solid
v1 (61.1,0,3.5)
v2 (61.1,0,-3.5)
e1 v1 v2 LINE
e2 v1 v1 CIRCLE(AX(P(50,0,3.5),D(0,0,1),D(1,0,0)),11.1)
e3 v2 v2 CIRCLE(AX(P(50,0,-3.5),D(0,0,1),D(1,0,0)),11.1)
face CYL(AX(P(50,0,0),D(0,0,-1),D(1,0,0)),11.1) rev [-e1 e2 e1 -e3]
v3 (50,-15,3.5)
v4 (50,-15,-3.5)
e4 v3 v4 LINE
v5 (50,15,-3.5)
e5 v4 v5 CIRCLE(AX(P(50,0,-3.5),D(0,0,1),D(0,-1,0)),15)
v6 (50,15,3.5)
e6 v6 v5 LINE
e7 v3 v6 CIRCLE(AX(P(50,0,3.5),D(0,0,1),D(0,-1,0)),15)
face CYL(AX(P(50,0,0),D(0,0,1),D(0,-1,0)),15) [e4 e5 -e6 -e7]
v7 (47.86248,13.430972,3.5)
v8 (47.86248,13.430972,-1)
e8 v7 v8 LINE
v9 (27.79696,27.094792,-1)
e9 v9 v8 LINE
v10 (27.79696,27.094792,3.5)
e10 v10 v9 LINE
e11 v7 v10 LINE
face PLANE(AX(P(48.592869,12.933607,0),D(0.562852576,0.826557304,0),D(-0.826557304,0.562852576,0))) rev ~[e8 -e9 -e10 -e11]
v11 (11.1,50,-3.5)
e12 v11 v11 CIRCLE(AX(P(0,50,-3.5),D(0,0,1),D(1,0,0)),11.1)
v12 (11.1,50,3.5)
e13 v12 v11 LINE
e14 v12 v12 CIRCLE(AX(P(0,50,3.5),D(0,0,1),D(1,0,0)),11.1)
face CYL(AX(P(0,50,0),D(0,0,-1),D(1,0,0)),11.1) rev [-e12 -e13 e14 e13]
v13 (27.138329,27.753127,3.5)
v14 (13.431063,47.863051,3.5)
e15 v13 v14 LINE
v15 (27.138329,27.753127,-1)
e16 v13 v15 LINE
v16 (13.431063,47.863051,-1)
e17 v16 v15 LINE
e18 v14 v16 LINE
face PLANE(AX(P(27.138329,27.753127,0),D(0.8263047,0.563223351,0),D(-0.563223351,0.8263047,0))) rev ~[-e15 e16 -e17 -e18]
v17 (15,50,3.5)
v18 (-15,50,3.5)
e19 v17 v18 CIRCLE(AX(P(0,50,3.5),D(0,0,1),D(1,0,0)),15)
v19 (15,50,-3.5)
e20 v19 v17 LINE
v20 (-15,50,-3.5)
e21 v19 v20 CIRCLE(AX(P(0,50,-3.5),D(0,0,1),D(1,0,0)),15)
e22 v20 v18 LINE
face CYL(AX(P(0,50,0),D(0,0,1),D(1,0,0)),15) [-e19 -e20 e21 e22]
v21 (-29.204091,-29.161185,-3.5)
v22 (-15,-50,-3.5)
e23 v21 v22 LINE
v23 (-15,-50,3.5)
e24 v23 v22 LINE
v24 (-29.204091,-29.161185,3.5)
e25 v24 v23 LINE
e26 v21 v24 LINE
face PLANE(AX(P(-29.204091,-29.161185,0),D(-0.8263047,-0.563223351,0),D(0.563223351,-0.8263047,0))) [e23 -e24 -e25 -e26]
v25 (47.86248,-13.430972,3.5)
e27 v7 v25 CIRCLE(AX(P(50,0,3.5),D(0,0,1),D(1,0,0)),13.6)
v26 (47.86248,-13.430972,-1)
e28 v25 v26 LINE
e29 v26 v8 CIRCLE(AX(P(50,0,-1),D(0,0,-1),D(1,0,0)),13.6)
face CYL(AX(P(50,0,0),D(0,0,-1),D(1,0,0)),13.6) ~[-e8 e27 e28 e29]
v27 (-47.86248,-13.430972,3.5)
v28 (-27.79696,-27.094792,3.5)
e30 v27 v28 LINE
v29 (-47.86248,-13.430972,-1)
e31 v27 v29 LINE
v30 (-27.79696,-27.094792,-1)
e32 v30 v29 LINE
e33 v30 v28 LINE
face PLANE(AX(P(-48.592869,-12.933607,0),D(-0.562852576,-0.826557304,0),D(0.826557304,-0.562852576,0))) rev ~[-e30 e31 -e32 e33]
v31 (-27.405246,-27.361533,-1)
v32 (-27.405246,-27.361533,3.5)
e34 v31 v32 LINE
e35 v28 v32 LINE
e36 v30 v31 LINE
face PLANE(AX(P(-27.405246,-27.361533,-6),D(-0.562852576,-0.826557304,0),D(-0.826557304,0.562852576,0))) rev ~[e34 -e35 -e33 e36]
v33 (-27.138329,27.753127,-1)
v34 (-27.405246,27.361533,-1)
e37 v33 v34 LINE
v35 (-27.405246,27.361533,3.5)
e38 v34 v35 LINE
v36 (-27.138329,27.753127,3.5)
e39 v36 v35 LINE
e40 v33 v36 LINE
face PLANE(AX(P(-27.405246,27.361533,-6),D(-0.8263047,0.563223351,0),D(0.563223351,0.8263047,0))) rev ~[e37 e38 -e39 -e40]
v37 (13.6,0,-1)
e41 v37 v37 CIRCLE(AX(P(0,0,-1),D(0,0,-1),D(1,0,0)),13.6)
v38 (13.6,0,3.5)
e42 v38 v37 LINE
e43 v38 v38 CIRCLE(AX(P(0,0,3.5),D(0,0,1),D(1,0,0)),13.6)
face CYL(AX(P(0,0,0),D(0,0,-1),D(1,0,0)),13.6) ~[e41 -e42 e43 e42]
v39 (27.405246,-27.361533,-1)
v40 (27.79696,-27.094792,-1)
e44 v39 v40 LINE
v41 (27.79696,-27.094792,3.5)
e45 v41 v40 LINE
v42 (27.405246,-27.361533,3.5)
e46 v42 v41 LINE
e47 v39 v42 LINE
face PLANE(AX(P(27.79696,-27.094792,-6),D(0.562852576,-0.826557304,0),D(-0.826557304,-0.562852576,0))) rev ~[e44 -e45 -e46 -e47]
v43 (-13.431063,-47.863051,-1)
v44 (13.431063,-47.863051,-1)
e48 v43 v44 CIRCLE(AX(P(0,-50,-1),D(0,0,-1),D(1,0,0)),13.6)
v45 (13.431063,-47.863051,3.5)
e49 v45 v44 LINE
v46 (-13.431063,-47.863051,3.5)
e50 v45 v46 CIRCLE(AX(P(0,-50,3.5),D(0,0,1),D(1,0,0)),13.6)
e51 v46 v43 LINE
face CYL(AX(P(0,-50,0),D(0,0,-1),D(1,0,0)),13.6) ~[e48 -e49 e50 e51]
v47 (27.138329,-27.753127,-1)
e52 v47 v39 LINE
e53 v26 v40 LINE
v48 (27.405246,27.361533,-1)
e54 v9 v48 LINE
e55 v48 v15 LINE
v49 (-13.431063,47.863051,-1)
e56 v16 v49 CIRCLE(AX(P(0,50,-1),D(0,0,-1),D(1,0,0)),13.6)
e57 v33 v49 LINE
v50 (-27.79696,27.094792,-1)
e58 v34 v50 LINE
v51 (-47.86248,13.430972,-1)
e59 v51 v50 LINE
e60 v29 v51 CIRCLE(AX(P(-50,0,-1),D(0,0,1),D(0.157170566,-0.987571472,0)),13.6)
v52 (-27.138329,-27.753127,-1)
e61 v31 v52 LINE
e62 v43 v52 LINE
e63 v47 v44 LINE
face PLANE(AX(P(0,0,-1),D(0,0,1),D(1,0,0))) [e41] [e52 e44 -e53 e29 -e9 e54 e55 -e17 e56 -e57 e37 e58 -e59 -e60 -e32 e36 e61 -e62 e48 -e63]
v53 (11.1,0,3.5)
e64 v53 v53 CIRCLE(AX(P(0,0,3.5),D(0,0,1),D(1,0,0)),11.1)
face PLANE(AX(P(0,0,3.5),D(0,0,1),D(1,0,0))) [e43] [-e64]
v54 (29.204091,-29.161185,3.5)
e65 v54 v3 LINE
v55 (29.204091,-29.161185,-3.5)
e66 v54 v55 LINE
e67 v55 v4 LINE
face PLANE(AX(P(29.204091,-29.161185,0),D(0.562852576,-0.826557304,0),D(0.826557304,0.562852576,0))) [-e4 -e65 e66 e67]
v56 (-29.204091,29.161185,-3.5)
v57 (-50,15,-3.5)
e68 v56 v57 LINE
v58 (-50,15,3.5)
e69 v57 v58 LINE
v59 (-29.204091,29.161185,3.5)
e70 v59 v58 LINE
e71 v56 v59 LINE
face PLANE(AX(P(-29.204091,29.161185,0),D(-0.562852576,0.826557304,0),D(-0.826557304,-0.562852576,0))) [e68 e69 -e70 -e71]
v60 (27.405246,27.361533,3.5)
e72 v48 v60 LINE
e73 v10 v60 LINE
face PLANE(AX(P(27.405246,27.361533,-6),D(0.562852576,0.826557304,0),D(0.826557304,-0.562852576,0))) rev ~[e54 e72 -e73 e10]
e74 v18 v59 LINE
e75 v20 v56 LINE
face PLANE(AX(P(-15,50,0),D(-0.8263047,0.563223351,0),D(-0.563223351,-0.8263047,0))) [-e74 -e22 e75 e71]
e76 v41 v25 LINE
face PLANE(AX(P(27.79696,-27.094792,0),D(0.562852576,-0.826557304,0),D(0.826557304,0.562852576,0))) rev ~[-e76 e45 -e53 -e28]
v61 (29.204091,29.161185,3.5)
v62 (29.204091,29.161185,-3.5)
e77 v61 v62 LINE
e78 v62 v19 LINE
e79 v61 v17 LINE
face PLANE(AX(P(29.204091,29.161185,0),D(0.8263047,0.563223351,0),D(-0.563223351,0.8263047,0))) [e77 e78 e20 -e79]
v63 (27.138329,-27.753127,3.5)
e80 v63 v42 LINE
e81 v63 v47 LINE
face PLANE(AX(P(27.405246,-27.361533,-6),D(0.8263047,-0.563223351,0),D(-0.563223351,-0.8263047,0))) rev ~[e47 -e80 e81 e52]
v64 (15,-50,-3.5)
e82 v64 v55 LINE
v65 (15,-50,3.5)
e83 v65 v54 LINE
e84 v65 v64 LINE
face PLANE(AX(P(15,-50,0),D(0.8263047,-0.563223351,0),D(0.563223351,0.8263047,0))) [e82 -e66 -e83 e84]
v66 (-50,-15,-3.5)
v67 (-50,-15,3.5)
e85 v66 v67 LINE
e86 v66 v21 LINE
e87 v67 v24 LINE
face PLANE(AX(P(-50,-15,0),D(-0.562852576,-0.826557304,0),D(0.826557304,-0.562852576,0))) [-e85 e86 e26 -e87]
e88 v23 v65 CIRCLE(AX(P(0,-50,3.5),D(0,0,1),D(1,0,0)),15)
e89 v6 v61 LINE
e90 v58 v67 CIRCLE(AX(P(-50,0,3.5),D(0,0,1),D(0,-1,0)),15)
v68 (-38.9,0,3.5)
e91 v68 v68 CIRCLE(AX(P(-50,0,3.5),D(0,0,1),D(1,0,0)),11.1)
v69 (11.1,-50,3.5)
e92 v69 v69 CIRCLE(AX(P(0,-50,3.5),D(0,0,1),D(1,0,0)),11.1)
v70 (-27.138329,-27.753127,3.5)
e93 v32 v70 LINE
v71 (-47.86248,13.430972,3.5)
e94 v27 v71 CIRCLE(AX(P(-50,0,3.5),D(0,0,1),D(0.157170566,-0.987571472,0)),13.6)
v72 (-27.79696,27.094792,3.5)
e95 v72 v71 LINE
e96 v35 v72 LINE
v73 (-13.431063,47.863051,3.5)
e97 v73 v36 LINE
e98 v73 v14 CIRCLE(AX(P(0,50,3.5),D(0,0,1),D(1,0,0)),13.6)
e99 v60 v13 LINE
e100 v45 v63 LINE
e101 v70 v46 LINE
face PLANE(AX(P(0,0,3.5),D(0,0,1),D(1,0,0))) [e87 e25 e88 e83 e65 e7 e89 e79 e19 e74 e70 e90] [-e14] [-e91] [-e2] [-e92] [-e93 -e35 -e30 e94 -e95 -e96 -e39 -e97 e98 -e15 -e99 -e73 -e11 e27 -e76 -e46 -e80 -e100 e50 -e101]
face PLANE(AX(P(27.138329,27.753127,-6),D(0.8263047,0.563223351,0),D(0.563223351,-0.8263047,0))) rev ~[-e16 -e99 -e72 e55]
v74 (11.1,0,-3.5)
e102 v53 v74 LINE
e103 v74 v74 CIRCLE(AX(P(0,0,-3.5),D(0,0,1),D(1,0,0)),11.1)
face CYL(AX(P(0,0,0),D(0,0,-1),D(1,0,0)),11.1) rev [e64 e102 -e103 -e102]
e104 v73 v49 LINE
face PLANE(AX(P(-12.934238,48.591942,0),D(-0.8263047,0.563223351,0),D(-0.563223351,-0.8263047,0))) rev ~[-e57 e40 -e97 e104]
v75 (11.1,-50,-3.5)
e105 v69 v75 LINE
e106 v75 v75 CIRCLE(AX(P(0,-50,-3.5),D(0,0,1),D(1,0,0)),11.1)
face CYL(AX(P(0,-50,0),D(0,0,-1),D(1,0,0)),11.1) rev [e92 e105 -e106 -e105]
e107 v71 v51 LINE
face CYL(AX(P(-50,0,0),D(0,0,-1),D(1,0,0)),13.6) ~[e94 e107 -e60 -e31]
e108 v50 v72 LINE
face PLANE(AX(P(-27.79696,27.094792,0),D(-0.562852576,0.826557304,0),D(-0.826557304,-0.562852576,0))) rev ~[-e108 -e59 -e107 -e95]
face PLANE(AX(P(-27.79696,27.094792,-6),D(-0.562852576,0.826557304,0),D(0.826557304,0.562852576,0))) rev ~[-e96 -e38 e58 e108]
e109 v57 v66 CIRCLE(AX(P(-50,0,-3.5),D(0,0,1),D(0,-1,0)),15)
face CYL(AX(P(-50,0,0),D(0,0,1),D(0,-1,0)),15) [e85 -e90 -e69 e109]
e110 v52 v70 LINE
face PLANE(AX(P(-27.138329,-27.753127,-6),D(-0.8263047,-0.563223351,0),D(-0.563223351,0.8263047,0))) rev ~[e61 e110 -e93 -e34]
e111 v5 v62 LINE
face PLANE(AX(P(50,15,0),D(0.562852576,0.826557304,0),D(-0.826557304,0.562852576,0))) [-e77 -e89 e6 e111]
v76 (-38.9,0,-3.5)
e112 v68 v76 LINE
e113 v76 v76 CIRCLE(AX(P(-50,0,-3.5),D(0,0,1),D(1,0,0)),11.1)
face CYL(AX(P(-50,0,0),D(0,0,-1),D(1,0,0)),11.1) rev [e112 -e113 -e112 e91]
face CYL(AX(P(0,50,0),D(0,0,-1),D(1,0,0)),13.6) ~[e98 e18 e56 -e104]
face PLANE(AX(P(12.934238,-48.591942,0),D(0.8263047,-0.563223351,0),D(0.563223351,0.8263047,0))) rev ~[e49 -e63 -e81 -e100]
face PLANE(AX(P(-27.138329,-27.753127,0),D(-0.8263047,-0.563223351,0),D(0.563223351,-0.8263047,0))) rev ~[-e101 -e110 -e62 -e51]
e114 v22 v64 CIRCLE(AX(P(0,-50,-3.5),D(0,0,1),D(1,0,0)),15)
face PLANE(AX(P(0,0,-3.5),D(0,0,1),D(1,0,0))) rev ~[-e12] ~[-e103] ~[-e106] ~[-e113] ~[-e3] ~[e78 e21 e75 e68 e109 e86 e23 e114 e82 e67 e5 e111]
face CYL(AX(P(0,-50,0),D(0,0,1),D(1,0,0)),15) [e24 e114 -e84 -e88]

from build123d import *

# Parameters (mm, degrees)
F0_R        = 11.1
F1_DEPTH    = 3.5
F2_T        = 2.5
F2_T3_DEPTH = 12


# Not quite as in the source:
# - a shell that OpenCascade refuses in one call is made with other operations: the cavity is built on its own and cut out


with BuildPart() as f1:
    # F0 (on Top) → F1 (new body, symmetric)
    with BuildSketch(Plane.XY):
        with BuildLine():
            Line((29.2040910572, 29.1611850262), (15, 50))
            ThreePointArc((15, 50), (0, 35), (-15, 50))
            Line((-15, 50), (-29.2040910572, 29.1611850262))
            Line((-29.2040910572, 29.1611850262), (-50, 15))
            ThreePointArc((-50, 15), (-39.3933982822, 10.6066017178), (-35, 0))
            ThreePointArc((-35, 0), (-39.3933982822, -10.6066017178), (-50, -15))
            Line((-50, -15), (-29.2040910572, -29.1611850262))
            Line((-29.2040910572, -29.1611850262), (-15, -50))
            ThreePointArc((-15, -50), (0, -35), (15, -50))
            Line((15, -50), (29.2040910572, -29.1611850262))
            Line((29.2040910572, -29.1611850262), (50, -15))
            ThreePointArc((50, -15), (35, 0), (50, 15))
            Line((50, 15), (29.2040910572, 29.1611850262))
        make_face()
        Circle(F0_R, mode=Mode.SUBTRACT)
        with BuildLine():
            ThreePointArc((-15, 50), (0, 35), (15, 50))
            ThreePointArc((15, 50), (0, 65), (-15, 50))
        make_face()
        with Locations((0, 50)):
            Circle(F0_R, mode=Mode.SUBTRACT)
        with BuildLine():
            ThreePointArc((65, 0), (60.6066017178, 10.6066017178), (50, 15))
            ThreePointArc((50, 15), (35, 0), (50, -15))
            ThreePointArc((50, -15), (60.6066017178, -10.6066017178), (65, 0))
        make_face()
        with Locations((50, 0)):
            Circle(F0_R, mode=Mode.SUBTRACT)
        with BuildLine():
            ThreePointArc((-15, -50), (0, -65), (15, -50))
            ThreePointArc((15, -50), (0, -35), (-15, -50))
        make_face()
        with Locations((0, -50)):
            Circle(F0_R, mode=Mode.SUBTRACT)
        with BuildLine():
            ThreePointArc((-35, 0), (-39.3933982822, 10.6066017178), (-50, 15))
            ThreePointArc((-50, 15), (-65, 0), (-50, -15))
            ThreePointArc((-50, -15), (-39.3933982822, -10.6066017178), (-35, 0))
        make_face()
        with Locations((-50, 0)):
            Circle(F0_R, mode=Mode.SUBTRACT)
    extrude(amount=F1_DEPTH, both=True)

    # F2: shell of thickness 2.5, made by hand


with BuildPart() as f2_core1:
    # F2_t2: copy of F1
    add(f1.part)

    # the walls: a layer under each face that stays
    f2_faces = [f2_core1.faces().sort_by_distance(p)[0] for p in [
        (39.6020455286, -22.0805925131, 0),
        (22.1020455286, -39.5805925131, 0),
        (0, -65, 0),
        (-22.1020455286, -39.5805925131, 0),
        (-39.6020455286, -22.0805925131, 0),
        (-65, 0, 0),
        (-39.6020455286, 22.0805925131, 0),
        (-22.1020455286, 39.5805925131, 0),
        (0, 65, 0),
        (22.1020455286, 39.5805925131, 0),
        (39.6020455286, 22.0805925131, 0),
        (-61.1, 0, 0),
        (-11.1, -50, 0),
        (38.9, 0, 0),
        (-11.1, 50, 0),
        (-11.1, 0, 0),
        (65, 0, 0),
        (-37.1428571429, -18.5714285714, -3.5),
    ]]
    thicken(f2_faces, amount=-F2_T, mode=Mode.SUBTRACT)

    # F2_s4 → F2_t3 (cut)
    with BuildSketch(Plane.XY.offset(-6)):
        Polygon((50.0140713144, -15.0456639326), (48.5928685595, -12.933606739), (49.2296264469, -12.5), (50, -12.5), align=None)
        Polygon((29.2388199891, -29.1959295426), (27.7969596167, -27.0947917651), (27.4052462259, -27.3615329699), (27.1383293075, -27.753126649), align=None)
        Polygon((15.0456576175, -50.0140805838), (12.9342382503, -48.5919416228), (12.5, -49.2290123454), (12.5, -50), align=None)
        Polygon((-15.0456576175, -50.0140805838), (-12.5, -50), (-12.5, -49.2290123454), (-12.9342382503, -48.5919416228), align=None)
        Polygon((-29.2388199891, -29.1959295426), (-27.1383293075, -27.753126649), (-27.4052462259, -27.3615329699), (-27.7969596167, -27.0947917651), align=None)
        Polygon((-50.0140713144, -15.0456639326), (-48.5928685595, -12.933606739), (-49.2296264469, -12.5), (-50, -12.5), align=None)
        Polygon((-50.0140713144, 15.0456639326), (-50, 12.5), (-49.2296264469, 12.5), (-48.5928685595, 12.933606739), align=None)
        Polygon((-29.2388199891, 29.1959295426), (-27.7969596167, 27.0947917651), (-27.4052462259, 27.3615329699), (-27.1383293075, 27.753126649), align=None)
        Polygon((-15.0456576175, 50.0140805838), (-12.9342382503, 48.5919416228), (-12.5, 49.2290123454), (-12.5, 50), align=None)
        Polygon((15.0456576175, 50.0140805838), (12.5, 50), (12.5, 49.2290123454), (12.9342382503, 48.5919416228), align=None)
        Polygon((29.2388199891, 29.1959295426), (27.1383293075, 27.753126649), (27.4052462259, 27.3615329699), (27.7969596167, 27.0947917651), align=None)
        Polygon((50.0140713144, 15.0456639326), (48.5928685595, 12.933606739), (49.2296264469, 12.5), (50, 12.5), align=None)
    extrude(amount=F2_T3_DEPTH, mode=Mode.SUBTRACT)


with BuildPart() as f1_1:
    add(f1.part)

    # what is left inside the walls is the cavity
    f2_cavity = [f2_core1.part.solids().sort_by_distance(p)[0] for p in [
        (0, -15.95435, 3.475),
    ]]
    add(f2_cavity, mode=Mode.SUBTRACT)


solid = f1_1.part
